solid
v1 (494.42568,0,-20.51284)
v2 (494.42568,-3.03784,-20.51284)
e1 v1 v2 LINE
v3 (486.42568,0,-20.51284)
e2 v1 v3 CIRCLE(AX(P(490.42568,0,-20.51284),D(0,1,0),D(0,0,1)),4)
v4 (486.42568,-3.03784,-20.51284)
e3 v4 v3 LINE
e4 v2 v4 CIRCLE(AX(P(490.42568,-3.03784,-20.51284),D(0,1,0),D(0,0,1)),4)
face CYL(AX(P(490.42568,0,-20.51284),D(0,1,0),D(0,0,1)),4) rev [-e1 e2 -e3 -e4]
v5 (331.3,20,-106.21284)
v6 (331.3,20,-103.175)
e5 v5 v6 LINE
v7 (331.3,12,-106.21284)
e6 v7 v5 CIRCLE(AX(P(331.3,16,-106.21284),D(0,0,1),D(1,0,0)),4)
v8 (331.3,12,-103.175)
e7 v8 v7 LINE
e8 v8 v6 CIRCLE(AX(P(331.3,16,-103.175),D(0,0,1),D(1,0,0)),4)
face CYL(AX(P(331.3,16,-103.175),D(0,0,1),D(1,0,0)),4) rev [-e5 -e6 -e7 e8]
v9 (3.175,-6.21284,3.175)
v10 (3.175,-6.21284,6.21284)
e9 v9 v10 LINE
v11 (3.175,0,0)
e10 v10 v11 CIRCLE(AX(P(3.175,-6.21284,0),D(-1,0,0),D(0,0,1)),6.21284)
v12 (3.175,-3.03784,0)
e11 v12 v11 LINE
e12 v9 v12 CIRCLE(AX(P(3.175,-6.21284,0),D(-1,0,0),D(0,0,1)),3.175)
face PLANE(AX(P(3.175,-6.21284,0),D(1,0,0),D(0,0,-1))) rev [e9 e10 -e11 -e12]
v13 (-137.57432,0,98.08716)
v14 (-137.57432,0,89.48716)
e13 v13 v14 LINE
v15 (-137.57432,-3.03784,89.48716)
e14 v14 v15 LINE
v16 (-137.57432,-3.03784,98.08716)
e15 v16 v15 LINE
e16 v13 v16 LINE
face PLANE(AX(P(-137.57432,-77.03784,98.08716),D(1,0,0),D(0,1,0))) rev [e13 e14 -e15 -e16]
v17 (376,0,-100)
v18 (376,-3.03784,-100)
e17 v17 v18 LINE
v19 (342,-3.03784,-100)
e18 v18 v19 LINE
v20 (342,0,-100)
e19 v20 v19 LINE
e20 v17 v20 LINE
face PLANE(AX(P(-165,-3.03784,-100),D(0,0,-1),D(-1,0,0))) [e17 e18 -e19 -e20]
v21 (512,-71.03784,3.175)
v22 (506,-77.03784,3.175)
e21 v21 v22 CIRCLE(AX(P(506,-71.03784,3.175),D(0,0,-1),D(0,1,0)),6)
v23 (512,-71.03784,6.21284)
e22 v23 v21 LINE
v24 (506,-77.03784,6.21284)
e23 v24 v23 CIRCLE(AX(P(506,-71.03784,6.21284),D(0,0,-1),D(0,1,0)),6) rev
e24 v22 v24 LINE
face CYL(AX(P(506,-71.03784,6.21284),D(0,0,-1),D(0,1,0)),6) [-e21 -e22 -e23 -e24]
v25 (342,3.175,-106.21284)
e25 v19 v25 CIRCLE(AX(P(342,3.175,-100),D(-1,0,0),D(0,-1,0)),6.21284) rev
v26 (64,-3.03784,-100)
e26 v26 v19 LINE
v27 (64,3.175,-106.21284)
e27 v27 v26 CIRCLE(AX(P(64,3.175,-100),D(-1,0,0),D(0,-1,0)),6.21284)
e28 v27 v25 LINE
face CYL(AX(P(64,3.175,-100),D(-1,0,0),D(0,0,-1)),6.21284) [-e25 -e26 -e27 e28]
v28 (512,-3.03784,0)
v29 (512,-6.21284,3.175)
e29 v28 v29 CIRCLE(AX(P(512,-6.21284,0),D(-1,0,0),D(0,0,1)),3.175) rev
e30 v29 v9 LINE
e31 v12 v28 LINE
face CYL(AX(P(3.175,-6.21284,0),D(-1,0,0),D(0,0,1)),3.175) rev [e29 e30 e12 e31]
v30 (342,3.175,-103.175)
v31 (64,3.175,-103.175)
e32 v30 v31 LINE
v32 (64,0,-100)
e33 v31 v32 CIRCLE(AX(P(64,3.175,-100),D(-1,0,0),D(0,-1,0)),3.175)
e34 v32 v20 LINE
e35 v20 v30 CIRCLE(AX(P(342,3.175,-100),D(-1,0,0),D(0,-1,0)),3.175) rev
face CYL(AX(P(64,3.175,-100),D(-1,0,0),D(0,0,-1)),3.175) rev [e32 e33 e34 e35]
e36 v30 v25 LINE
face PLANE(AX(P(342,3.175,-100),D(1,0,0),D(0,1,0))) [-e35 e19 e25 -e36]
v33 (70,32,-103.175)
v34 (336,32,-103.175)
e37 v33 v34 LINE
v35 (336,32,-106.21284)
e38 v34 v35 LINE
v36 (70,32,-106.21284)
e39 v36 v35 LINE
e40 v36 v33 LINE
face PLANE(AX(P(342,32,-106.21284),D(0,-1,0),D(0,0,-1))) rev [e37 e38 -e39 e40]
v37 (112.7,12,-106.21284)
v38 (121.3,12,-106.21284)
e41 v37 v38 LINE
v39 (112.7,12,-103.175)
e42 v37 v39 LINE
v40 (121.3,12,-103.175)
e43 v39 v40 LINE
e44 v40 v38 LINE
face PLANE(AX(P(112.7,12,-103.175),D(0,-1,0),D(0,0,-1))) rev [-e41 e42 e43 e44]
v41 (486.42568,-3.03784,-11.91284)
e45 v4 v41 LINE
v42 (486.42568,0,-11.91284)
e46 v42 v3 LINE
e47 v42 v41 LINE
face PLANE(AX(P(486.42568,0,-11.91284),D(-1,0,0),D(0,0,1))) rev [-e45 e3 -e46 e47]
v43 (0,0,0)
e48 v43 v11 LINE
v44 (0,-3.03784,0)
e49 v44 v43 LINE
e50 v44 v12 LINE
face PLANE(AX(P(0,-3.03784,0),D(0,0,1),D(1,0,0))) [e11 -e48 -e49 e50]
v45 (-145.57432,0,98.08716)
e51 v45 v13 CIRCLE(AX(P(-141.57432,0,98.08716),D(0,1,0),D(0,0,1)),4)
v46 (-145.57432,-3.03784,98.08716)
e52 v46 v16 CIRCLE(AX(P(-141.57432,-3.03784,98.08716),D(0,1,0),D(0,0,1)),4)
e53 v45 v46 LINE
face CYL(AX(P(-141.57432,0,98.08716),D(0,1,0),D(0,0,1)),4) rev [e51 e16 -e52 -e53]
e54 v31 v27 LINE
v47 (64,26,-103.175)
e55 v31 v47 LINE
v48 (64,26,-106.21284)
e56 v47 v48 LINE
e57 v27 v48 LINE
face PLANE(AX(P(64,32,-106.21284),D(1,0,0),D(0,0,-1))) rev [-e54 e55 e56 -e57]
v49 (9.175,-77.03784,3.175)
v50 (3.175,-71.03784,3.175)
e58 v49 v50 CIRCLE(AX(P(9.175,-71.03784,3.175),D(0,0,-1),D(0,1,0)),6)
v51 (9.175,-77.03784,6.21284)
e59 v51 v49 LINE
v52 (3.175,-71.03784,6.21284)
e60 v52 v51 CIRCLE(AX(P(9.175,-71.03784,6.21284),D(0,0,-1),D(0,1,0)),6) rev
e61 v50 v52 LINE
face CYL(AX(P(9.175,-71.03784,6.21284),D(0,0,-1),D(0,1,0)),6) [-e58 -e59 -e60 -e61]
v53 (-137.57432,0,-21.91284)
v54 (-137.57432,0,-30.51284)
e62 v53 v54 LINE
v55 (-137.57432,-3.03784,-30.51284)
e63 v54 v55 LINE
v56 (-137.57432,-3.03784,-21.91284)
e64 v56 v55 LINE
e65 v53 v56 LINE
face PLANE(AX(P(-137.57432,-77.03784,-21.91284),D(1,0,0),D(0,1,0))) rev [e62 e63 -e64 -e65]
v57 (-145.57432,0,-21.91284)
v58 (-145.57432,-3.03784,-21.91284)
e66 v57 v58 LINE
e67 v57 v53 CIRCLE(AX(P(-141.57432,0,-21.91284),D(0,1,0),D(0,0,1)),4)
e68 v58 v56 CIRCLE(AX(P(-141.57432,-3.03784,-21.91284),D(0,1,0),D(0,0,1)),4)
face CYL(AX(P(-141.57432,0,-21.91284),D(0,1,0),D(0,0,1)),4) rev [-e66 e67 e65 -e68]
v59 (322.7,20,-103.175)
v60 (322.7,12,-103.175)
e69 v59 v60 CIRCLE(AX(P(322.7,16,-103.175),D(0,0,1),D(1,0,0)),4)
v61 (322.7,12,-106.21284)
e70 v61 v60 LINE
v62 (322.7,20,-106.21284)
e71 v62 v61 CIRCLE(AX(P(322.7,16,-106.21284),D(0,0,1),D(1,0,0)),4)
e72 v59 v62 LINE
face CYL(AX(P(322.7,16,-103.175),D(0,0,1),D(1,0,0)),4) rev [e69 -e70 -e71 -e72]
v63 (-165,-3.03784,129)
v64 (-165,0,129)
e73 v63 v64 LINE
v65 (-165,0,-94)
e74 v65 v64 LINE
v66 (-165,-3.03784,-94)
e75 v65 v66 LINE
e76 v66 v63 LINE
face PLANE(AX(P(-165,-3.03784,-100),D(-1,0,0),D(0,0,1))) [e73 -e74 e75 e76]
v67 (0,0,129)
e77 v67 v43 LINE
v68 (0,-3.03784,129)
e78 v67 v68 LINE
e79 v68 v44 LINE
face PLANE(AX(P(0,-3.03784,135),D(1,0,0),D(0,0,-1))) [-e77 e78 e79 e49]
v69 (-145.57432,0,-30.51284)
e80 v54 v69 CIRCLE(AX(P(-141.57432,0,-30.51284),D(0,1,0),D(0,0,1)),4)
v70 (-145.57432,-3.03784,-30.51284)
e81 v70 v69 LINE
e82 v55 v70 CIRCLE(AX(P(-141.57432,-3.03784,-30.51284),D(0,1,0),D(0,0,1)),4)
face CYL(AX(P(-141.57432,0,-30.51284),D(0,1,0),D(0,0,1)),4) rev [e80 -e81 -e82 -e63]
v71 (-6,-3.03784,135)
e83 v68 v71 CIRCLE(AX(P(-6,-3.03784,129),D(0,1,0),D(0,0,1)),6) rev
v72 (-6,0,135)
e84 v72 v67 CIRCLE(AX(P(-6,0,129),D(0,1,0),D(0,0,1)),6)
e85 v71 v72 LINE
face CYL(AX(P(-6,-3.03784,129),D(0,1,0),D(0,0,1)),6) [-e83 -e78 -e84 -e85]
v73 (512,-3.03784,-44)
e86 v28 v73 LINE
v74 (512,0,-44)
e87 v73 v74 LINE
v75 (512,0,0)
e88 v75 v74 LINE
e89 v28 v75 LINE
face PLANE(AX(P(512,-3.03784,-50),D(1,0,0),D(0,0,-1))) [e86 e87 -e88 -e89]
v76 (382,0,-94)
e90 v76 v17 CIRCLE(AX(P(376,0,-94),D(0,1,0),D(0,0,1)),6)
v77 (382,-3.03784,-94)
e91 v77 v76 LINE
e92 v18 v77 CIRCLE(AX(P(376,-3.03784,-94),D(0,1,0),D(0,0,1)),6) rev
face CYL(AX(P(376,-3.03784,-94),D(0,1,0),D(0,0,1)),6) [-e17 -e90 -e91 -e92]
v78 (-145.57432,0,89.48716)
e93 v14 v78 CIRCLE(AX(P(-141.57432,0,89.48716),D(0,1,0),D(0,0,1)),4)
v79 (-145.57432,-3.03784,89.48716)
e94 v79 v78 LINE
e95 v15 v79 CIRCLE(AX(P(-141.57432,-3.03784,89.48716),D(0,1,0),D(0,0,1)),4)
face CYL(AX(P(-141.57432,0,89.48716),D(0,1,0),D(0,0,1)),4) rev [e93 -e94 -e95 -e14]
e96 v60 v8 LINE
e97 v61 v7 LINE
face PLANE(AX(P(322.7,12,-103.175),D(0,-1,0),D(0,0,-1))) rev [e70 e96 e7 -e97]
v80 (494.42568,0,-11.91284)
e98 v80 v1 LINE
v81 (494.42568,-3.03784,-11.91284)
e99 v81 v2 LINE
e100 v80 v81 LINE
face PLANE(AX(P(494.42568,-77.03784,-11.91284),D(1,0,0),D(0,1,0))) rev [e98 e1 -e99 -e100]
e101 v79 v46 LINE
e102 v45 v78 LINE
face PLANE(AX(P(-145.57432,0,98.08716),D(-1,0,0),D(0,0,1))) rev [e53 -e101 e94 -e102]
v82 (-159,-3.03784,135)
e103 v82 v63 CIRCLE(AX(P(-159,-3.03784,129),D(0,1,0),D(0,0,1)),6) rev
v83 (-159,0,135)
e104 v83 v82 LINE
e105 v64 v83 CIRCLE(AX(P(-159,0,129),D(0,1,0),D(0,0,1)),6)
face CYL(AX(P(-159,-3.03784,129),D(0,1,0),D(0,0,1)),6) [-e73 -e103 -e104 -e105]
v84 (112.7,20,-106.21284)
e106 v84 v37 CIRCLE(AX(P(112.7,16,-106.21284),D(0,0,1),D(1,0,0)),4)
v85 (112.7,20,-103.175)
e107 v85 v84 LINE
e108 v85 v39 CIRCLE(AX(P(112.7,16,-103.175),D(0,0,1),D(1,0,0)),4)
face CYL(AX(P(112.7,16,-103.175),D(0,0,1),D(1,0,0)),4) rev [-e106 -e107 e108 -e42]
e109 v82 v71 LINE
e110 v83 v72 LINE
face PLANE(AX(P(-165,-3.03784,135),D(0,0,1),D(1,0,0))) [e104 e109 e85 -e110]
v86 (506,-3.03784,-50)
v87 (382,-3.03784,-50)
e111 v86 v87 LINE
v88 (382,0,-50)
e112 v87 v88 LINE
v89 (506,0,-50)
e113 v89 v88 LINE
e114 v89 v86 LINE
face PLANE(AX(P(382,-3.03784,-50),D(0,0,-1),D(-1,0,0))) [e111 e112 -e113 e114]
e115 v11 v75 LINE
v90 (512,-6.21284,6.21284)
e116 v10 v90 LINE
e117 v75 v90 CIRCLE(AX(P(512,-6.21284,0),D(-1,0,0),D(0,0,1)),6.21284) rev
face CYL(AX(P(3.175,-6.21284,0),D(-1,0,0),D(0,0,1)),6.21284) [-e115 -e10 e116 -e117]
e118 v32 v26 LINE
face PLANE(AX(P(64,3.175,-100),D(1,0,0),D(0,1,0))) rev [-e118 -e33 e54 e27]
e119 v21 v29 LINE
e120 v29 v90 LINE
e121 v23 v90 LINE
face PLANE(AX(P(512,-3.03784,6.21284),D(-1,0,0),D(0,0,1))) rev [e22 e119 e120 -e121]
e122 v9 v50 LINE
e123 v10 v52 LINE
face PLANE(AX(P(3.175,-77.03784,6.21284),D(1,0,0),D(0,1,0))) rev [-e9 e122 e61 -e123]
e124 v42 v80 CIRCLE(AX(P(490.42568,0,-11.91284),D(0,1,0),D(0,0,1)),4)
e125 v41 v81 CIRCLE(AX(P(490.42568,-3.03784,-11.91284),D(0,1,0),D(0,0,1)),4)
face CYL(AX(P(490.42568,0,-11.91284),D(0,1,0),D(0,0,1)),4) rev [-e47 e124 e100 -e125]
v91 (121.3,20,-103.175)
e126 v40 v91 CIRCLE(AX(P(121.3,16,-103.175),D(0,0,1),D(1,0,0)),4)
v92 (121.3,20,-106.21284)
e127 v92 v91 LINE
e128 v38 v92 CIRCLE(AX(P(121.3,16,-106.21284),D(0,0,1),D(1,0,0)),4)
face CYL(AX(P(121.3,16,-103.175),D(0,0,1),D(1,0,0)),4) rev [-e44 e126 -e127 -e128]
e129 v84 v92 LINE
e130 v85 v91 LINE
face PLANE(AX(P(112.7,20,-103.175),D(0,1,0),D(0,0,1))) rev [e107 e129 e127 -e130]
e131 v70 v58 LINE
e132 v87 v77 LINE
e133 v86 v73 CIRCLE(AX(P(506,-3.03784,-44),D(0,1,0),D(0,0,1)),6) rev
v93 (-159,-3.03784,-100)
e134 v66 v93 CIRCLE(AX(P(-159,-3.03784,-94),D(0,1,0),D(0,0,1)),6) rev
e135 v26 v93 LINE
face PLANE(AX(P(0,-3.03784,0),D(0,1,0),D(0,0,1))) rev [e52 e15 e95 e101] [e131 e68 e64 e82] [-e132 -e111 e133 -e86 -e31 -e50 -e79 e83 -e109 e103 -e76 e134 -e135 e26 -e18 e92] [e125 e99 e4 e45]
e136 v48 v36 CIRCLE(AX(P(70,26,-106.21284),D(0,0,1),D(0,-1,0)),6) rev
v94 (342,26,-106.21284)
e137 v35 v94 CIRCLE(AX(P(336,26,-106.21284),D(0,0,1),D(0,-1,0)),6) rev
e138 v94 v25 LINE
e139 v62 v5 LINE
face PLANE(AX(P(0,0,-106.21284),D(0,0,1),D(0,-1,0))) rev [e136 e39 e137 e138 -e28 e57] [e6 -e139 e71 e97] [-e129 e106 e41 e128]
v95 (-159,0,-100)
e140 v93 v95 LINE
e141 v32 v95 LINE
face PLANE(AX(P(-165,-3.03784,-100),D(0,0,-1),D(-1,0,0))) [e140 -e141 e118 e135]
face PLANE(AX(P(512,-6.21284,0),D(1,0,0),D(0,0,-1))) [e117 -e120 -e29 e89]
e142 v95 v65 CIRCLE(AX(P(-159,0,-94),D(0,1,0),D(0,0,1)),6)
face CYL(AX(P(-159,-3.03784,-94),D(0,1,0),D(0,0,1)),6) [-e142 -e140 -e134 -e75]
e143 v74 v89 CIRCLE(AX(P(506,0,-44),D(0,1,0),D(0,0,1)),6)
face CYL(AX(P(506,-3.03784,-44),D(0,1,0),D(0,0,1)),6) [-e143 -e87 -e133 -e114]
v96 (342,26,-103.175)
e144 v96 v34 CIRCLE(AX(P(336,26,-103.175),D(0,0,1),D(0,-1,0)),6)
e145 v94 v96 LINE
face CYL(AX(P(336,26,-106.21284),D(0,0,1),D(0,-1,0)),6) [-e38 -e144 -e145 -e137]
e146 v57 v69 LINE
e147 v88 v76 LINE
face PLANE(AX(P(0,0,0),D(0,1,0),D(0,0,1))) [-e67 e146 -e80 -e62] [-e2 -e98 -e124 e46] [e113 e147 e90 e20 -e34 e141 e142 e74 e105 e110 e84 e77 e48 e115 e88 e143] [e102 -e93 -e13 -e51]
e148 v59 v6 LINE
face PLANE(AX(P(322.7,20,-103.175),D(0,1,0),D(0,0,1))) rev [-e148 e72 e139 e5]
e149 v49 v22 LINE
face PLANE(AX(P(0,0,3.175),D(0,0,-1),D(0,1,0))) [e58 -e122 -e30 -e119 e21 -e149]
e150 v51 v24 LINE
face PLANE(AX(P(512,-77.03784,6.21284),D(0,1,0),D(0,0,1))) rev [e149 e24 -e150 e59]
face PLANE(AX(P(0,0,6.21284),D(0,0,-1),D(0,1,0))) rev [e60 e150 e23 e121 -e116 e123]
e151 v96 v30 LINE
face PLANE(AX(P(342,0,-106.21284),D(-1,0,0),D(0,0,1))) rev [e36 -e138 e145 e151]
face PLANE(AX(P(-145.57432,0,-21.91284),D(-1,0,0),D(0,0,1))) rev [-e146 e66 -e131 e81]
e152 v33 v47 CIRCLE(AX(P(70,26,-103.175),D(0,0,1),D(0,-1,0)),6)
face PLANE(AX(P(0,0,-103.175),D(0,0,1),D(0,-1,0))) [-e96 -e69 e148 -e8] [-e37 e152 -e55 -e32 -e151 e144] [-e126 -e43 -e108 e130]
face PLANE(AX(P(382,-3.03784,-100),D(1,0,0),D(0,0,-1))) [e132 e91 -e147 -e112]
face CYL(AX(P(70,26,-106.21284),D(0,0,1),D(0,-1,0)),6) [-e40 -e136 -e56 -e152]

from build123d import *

# Parameters (mm, degrees)
BASE_FLANGE1_DEPTH       = 3.03784
EDGE_FLANGE1_DEPTH       = 278
EDGE_FLANGE2_DEPTH       = 508.825
M6_START                 = -106.21284
M6_CLEARANCE_SLOT1_DEPTH = 3.03784
M6_START_2               = -3.03784
M6_CLEARANCE_SLOT2_DEPTH = 3.03784
FILLET1_R                = 6


# Read off the part's stored shape, not the designer's step: M6 Clearance Slot1, M6 Clearance Slot2
# Sheet-metal steps are written as plain solids
with BuildPart() as part:
    # Sketch1 → Base-Flange1 (new body)
    with BuildSketch(Plane(origin=(0, 0, 0), x_dir=(1, 0, 0), z_dir=(0, 1, 0))):
        Polygon((0, -135), (0, 0), (512, 0), (512, 50), (382, 50), (382, 100), (-165, 100), (-165, -135), align=None)
    extrude(amount=-BASE_FLANGE1_DEPTH)

    # Edge-Flange1 section (across the edge) → Edge-Flange1 (add)
    with BuildSketch(Plane(origin=(342, 0, -103.175), x_dir=(0, 0, 1), z_dir=(-1, 0, 0))):
        with BuildLine():
            Line((-3.03784, 3.175), (-3.03784, 32))
            Line((-3.03784, 32), (0, 32))
            Line((0, 32), (0, 3.175))
            ThreePointArc((0, 3.175), (0.92993597, 0.92993597), (3.175, 0))
            Line((3.175, 0), (3.175, -3.03784))
            ThreePointArc((3.175, -3.03784), (-1.218141294, -1.218141294), (-3.03784, 3.175))
        make_face()
    extrude(amount=EDGE_FLANGE1_DEPTH)

    # Edge-Flange2 section (across the edge) → Edge-Flange2 (add)
    with BuildSketch(Plane(origin=(512, -3.03784, 3.175), x_dir=(0, 0, -1), z_dir=(-1, 0, 0))):
        with BuildLine():
            Line((-3.03784, 3.175), (-3.03784, 74))
            Line((-3.03784, 74), (0, 74))
            Line((0, 74), (0, 3.175))
            ThreePointArc((0, 3.175), (0.92993597, 0.92993597), (3.175, 0))
            Line((3.175, 0), (3.175, -3.03784))
            ThreePointArc((3.175, -3.03784), (-1.218141294, -1.218141294), (-3.03784, 3.175))
        make_face()
    extrude(amount=EDGE_FLANGE2_DEPTH)

    # M6 Clearance Slot1 outline → M6 Clearance Slot1 (cut)
    with BuildSketch(Plane.XY.offset(M6_START)):
        with BuildLine():
            Line((112.7, 12), (121.3, 12))
            ThreePointArc((121.3, 12), (125.3, 16), (121.3, 20))
            Line((121.3, 20), (112.7, 20))
            ThreePointArc((112.7, 20), (108.7, 16), (112.7, 12))
        make_face()
        with BuildLine():
            ThreePointArc((331.3, 12), (335.3, 16), (331.3, 20))
            Line((331.3, 20), (322.7, 20))
            ThreePointArc((322.7, 20), (318.7, 16), (322.7, 12))
            Line((322.7, 12), (331.3, 12))
        make_face()
    extrude(amount=M6_CLEARANCE_SLOT1_DEPTH, mode=Mode.SUBTRACT)

    # M6 Clearance Slot2 outline → M6 Clearance Slot2 (cut)
    with BuildSketch(Plane(origin=(0, 0, 0), x_dir=(1, 0, 0), z_dir=(0, 1, 0)).offset(M6_START_2)):
        with BuildLine():
            Line((-137.57432, -98.08716), (-137.57432, -89.48716))
            ThreePointArc((-137.57432, -89.48716), (-141.57432, -85.48716), (-145.57432, -89.48716))
            Line((-145.57432, -89.48716), (-145.57432, -98.08716))
            ThreePointArc((-145.57432, -98.08716), (-141.57432, -102.08716), (-137.57432, -98.08716))
        make_face()
        with BuildLine():
            ThreePointArc((-137.57432, 30.51284), (-141.57432, 34.51284), (-145.57432, 30.51284))
            Line((-145.57432, 30.51284), (-145.57432, 21.91284))
            ThreePointArc((-145.57432, 21.91284), (-141.57432, 17.91284), (-137.57432, 21.91284))
            Line((-137.57432, 21.91284), (-137.57432, 30.51284))
        make_face()
        with BuildLine():
            Line((494.42568, 11.91284), (494.42568, 20.51284))
            ThreePointArc((494.42568, 20.51284), (490.42568, 24.51284), (486.42568, 20.51284))
            Line((486.42568, 20.51284), (486.42568, 11.91284))
            ThreePointArc((486.42568, 11.91284), (490.42568, 7.91284), (494.42568, 11.91284))
        make_face()
    extrude(amount=M6_CLEARANCE_SLOT2_DEPTH, mode=Mode.SUBTRACT)

    # Fillet1
    fillet1_edges = [part.edges().sort_by_distance(p)[0] for p in [
        (-165, -1.51892, -100),
        (382, -1.51892, -100),
        (512, -1.51892, -50),
        (0, -1.51892, 135),
        (-165, -1.51892, 135),
        (342, 32, -104.69392),
        (64, 32, -104.69392),
        (512, -77.03784, 4.69392),
        (3.175, -77.03784, 4.69392),
    ]]
    fillet(fillet1_edges, radius=FILLET1_R)


solid = part.part
